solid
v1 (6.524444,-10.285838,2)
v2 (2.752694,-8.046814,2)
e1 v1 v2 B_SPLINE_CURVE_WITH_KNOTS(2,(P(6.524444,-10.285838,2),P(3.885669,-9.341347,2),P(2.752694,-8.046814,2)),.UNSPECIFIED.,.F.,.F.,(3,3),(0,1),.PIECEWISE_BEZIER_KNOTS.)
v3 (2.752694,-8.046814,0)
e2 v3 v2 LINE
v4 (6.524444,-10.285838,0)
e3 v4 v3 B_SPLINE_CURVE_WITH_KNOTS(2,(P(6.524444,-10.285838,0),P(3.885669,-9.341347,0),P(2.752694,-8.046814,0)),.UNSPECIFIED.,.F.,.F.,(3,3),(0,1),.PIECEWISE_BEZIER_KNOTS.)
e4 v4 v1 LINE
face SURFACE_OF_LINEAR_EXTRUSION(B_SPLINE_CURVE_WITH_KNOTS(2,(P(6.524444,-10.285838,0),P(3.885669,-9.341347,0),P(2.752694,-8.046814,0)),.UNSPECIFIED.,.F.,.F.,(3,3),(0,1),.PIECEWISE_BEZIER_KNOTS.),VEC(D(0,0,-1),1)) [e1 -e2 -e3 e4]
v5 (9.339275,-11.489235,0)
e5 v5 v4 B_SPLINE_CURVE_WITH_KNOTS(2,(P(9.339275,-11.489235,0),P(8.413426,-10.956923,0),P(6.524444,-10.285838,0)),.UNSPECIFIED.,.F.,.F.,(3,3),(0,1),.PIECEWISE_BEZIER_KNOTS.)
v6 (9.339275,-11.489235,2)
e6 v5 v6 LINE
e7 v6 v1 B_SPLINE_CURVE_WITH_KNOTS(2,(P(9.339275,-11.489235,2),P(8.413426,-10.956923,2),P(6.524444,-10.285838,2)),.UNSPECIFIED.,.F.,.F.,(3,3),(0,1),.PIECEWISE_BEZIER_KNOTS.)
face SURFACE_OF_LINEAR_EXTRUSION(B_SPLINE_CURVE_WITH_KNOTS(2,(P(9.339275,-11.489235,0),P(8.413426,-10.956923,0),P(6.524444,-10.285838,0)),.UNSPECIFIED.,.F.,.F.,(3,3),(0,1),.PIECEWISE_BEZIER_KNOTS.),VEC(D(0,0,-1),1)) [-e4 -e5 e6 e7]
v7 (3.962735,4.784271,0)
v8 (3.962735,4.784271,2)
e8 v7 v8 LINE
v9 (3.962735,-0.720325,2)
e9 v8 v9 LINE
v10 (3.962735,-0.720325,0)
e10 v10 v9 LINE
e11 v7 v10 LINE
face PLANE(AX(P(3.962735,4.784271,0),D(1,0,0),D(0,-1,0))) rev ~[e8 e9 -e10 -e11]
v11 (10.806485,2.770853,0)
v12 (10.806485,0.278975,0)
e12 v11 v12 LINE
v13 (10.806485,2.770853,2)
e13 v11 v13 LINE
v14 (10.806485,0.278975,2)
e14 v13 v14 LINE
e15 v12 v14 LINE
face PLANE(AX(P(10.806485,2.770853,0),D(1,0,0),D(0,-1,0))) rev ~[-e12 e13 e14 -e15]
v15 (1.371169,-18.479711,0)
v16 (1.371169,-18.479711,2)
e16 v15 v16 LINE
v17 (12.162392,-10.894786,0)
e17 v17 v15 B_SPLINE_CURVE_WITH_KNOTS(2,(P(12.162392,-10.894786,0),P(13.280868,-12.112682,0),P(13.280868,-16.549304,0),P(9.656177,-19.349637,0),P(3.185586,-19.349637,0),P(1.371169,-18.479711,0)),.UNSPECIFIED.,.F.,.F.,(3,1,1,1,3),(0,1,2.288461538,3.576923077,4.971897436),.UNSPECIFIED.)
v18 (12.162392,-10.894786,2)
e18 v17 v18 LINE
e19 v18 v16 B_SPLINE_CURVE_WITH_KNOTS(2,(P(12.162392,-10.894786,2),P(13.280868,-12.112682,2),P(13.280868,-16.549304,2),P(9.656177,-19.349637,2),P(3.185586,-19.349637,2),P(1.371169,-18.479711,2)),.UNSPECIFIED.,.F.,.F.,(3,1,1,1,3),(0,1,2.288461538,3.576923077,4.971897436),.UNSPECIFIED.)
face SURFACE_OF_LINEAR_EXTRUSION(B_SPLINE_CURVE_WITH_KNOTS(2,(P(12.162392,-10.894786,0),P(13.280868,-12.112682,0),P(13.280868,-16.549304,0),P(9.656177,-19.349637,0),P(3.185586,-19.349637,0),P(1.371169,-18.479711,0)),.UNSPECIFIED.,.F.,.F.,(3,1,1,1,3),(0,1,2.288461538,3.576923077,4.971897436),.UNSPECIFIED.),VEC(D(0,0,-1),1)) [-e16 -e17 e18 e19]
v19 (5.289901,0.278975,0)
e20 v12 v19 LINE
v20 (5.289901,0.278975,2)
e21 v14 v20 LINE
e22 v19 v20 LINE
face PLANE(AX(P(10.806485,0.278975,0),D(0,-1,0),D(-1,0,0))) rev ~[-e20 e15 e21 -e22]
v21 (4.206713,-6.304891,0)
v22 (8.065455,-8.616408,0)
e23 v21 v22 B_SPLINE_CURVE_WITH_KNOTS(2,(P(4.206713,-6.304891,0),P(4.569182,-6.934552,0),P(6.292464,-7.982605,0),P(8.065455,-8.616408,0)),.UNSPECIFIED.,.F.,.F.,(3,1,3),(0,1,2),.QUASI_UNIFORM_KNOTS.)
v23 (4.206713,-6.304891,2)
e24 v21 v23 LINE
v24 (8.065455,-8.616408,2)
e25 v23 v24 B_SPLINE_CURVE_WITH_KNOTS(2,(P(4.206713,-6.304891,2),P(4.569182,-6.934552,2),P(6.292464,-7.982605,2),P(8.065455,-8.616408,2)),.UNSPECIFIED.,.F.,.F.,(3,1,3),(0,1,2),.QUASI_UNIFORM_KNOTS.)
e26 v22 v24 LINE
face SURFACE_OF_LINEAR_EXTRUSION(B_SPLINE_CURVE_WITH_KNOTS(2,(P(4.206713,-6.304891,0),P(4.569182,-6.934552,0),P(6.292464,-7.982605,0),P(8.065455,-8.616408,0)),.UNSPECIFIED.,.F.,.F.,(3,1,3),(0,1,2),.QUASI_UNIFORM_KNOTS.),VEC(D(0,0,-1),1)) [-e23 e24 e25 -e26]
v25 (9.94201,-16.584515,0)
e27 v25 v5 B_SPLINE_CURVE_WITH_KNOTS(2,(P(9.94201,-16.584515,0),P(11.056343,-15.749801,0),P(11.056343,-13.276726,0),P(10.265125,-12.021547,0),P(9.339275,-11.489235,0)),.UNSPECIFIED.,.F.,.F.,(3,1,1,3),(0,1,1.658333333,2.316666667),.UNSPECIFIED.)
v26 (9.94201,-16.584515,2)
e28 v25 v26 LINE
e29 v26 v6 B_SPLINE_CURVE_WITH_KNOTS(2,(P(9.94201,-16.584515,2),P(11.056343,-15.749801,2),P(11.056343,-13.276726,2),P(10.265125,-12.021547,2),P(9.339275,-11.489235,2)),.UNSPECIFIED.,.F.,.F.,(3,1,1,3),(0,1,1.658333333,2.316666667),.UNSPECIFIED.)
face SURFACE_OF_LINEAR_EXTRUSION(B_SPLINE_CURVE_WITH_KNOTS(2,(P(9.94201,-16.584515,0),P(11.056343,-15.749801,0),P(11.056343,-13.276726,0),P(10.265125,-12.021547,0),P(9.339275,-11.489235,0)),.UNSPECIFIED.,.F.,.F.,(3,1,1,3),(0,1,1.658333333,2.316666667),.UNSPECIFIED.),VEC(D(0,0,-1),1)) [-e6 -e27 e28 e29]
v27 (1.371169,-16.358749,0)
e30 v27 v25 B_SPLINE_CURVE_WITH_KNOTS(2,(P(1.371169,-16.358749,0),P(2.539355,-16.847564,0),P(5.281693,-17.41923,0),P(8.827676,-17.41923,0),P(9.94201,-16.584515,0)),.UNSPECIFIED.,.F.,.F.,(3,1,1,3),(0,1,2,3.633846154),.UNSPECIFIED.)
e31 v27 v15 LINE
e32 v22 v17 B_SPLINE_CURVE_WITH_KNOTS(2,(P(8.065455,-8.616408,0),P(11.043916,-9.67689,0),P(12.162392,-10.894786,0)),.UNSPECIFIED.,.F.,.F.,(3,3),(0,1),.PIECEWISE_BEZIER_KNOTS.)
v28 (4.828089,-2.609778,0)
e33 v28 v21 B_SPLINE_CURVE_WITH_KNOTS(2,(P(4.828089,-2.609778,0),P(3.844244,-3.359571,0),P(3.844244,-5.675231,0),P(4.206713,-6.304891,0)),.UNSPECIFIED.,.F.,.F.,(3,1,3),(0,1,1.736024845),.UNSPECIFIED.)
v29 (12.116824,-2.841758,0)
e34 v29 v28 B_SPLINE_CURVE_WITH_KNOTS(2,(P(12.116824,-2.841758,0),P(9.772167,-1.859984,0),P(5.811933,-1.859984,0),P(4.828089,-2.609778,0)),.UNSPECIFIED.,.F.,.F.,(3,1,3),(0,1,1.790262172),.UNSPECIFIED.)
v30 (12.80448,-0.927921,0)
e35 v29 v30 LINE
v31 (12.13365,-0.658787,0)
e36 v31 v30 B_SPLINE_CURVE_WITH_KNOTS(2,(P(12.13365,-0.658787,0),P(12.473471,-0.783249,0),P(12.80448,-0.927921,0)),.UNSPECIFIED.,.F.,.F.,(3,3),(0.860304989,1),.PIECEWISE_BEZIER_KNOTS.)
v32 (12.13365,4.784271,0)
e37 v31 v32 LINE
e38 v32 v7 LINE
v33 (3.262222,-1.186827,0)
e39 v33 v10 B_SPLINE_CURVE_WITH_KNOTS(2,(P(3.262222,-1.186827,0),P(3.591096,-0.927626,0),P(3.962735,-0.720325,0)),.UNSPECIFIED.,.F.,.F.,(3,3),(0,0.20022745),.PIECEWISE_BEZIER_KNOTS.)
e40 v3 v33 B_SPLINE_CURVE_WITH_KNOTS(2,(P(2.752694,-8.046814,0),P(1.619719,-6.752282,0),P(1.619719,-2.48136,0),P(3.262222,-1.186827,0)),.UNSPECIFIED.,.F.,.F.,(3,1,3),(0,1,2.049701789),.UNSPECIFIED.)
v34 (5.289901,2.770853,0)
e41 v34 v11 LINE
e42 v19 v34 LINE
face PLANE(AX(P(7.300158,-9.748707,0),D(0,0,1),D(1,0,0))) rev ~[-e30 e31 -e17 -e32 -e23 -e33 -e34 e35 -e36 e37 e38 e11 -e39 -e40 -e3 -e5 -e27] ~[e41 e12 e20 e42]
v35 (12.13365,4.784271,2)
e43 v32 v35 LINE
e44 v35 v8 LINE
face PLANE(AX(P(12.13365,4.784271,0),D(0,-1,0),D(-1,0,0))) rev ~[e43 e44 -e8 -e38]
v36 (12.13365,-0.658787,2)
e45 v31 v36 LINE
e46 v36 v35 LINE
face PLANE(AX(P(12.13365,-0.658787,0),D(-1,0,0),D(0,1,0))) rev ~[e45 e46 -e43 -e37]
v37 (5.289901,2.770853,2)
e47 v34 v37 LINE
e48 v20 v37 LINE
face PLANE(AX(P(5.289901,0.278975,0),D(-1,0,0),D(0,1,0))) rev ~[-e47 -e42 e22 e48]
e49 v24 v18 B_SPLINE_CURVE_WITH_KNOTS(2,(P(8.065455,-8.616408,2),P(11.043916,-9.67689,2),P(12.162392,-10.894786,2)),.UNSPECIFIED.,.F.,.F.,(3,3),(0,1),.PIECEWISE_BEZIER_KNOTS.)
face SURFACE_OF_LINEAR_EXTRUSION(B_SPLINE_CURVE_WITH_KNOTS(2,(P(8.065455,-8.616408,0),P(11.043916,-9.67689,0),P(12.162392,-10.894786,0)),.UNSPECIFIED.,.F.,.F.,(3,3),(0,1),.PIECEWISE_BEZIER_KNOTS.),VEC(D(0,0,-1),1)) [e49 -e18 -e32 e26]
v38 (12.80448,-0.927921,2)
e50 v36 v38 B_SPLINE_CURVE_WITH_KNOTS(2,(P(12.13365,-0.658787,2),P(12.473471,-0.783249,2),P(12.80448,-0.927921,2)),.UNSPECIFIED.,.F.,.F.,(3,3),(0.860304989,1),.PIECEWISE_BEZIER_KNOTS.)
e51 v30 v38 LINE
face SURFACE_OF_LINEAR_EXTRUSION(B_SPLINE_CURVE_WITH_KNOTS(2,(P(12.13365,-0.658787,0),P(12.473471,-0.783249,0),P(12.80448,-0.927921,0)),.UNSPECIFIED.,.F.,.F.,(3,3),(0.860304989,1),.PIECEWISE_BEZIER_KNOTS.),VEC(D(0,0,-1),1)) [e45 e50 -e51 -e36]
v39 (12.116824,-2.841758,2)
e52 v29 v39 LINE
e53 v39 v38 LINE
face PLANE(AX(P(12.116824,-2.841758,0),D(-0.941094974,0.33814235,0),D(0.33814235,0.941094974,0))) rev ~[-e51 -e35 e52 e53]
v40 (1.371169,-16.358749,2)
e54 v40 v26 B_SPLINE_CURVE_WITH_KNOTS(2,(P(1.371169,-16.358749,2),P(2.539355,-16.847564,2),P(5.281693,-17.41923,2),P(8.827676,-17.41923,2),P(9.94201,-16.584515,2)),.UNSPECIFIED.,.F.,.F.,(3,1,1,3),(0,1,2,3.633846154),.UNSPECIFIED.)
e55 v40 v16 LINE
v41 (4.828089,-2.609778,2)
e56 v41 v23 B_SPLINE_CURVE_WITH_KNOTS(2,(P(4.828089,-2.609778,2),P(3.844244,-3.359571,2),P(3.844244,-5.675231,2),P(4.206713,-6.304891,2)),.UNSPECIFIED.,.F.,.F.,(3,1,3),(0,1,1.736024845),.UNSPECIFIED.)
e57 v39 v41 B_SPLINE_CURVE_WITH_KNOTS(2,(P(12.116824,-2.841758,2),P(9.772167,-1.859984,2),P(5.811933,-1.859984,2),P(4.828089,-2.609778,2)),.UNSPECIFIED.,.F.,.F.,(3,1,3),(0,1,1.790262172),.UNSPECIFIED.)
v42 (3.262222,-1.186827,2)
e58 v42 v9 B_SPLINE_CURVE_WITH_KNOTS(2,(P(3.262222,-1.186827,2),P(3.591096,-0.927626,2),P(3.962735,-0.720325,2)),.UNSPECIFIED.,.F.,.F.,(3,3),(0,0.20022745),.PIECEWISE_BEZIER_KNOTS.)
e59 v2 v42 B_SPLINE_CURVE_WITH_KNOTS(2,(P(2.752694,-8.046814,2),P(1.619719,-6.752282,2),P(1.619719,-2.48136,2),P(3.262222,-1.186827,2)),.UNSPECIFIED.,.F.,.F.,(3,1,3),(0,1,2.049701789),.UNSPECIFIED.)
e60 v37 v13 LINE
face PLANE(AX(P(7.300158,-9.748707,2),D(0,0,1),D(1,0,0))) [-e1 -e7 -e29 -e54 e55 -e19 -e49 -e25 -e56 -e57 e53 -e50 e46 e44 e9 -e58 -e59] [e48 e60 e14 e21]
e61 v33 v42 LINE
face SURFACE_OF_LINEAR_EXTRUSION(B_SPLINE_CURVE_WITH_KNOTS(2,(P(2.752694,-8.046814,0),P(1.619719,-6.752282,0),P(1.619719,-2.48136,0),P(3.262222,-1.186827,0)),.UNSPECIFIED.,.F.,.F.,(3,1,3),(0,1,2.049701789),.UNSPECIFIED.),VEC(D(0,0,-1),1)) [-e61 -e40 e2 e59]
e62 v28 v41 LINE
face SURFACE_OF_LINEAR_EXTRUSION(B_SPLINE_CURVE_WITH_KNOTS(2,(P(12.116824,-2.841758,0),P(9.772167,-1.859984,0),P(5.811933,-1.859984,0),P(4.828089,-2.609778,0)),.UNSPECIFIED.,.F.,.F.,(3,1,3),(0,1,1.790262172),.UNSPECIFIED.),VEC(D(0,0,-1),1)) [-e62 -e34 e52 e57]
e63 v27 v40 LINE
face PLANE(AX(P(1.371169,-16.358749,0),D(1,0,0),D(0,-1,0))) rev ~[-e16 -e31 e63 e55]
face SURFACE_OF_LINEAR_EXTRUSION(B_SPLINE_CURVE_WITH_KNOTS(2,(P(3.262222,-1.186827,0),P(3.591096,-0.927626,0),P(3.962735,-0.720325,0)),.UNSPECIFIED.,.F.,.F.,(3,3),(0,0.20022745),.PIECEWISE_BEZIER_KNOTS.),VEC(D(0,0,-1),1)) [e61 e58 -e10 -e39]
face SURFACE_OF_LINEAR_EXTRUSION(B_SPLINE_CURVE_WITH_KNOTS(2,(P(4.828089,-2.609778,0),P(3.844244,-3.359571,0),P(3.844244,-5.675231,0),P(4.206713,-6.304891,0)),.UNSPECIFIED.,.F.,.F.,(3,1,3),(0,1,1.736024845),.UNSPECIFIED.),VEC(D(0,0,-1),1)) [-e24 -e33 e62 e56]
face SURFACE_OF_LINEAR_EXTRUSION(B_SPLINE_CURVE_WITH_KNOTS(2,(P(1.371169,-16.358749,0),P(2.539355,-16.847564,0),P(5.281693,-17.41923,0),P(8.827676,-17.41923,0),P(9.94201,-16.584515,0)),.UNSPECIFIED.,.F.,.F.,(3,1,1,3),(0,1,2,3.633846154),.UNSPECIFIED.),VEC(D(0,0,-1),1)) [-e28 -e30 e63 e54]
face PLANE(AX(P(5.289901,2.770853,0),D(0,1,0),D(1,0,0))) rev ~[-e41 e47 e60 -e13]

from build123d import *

# Parameters (mm, degrees)
F1_DEPTH = 2


# Not quite as in the source:
# - a feature names something its author has since deleted; it is built from what else it names


with BuildPart() as f1:
    # F0 (on Top) → F1 (new body)
    with BuildSketch(Plane.XY):
        with BuildLine():
            Line((12.1336504817, -0.6587872652), (12.1336504817, -1.7344431253))
            Line((12.1336504817, -1.7344431253), (8.0481928308, -1.7344431253))
            Line((8.0481928308, -1.7344431253), (3.9627351798, -1.7344431253))
            Line((3.9627351798, -1.7344431253), (3.9627351798, -0.7203246705))
            add(Edge.make_bspline(
                [(3.2622219629, -1.1868274189), (3.5910961238, -0.9276264724), (3.9627351798, -0.7203246705)],
                knots=[0, 0, 0, 0.2002274501, 0.2002274501, 0.2002274501], degree=2))
            add(Edge.make_bspline(
                [(1.6197190952, -4.668602098), (1.6197190952, -2.4813599438), (3.2622219629, -1.1868274189)],
                knots=[0, 0, 0, 1, 1, 1], degree=2))
            add(Edge.make_bspline(
                [(2.7526939611, -8.0468141751), (1.6197190952, -6.7522816502), (1.6197190952, -4.668602098)],
                knots=[0, 0, 0, 1, 1, 1], degree=2))
            add(Edge.make_bspline(
                [(6.5244439258, -10.2858376303), (3.8856688269, -9.3413467001), (2.7526939611, -8.0468141751)],
                knots=[0, 0, 0, 1, 1, 1], degree=2))
            add(Edge.make_bspline(
                [(9.339275448, -11.4892350655), (8.4134257862, -10.9569232912), (6.5244439258, -10.2858376303)],
                knots=[0, 0, 0, 1, 1, 1], degree=2))
            add(Edge.make_bspline(
                [(10.6607342495, -12.6491362079), (10.2651251099, -12.0215468398), (9.339275448, -11.4892350655)],
                knots=[0, 0, 0, 1, 1, 1], degree=2))
            add(Edge.make_bspline(
                [(11.0563433891, -14.2584990429), (11.0563433891, -13.276725576), (10.6607342495, -12.6491362079)],
                knots=[0, 0, 0, 1, 1, 1], degree=2))
            add(Edge.make_bspline(
                [(9.9420097917, -16.5845150837), (11.0563433891, -15.7498005116), (11.0563433891, -14.2584990429)],
                knots=[0, 0, 0, 1, 1, 1], degree=2))
            add(Edge.make_bspline(
                [(6.6280065278, -17.4192296558), (8.8276761942, -17.4192296558), (9.9420097917, -16.5845150837)],
                knots=[0, 0, 0, 1, 1, 1], degree=2))
            add(Edge.make_bspline(
                [(3.9105238514, -17.1333968743), (5.2816927018, -17.4192296558), (6.6280065278, -17.4192296558)],
                knots=[0, 0, 0, 1, 1, 1], degree=2))
            add(Edge.make_bspline(
                [(1.3711688504, -16.3587486114), (2.539355001, -16.8475640928), (3.9105238514, -17.1333968743)],
                knots=[0, 0, 0, 1, 1, 1], degree=2))
            Line((1.3711688504, -16.3587486114), (1.3711688504, -18.4797107003))
            add(Edge.make_bspline(
                [(6.5492989503, -19.349636557), (3.1855856374, -19.349636557), (1.3711688504, -18.4797107003)],
                knots=[0, 0, 0, 1, 1, 1], degree=2))
            add(Edge.make_bspline(
                [(11.4685225451, -17.949470178), (9.6561770102, -19.349636557), (6.5492989503, -19.349636557)],
                knots=[0, 0, 0, 1, 1, 1], degree=2))
            add(Edge.make_bspline(
                [(13.28086808, -14.0513738389), (13.28086808, -16.549303799), (11.4685225451, -17.949470178)],
                knots=[0, 0, 0, 1, 1, 1], degree=2))
            add(Edge.make_bspline(
                [(12.1623919785, -10.89478573), (13.28086808, -12.1126819295), (13.28086808, -14.0513738389)],
                knots=[0, 0, 0, 1, 1, 1], degree=2))
            add(Edge.make_bspline(
                [(8.0654554435, -8.6164084861), (11.0439158769, -9.6768895306), (12.1623919785, -10.89478573)],
                knots=[0, 0, 0, 1, 1, 1], degree=2))
            add(Edge.make_bspline(
                [(5.4308228487, -7.4585785958), (6.2924636973, -7.9826053619), (8.0654554435, -8.6164084861)],
                knots=[0, 0, 0, 1, 1, 1], degree=2))
            add(Edge.make_bspline(
                [(4.2067128931, -6.3048912095), (4.5691820001, -6.9345518297), (5.4308228487, -7.4585785958)],
                knots=[0, 0, 0, 1, 1, 1], degree=2))
            add(Edge.make_bspline(
                [(3.8442437861, -4.6934571225), (3.8442437861, -5.6752305894), (4.2067128931, -6.3048912095)],
                knots=[0, 0, 0, 1, 1, 1], degree=2))
            add(Edge.make_bspline(
                [(4.8280885051, -2.6097775703), (3.8442437861, -3.3595708088), (3.8442437861, -4.6934571225)],
                knots=[0, 0, 0, 1, 1, 1], degree=2))
            add(Edge.make_bspline(
                [(7.5600699457, -1.8599843319), (5.811933224, -1.8599843319), (4.8280885051, -2.6097775703)],
                knots=[0, 0, 0, 1, 1, 1], degree=2))
            add(Edge.make_bspline(
                [(12.1168244336, -2.8417577988), (9.7721671244, -1.8599843319), (7.5600699457, -1.8599843319)],
                knots=[0, 0, 0, 1, 1, 1], degree=2))
            Line((12.1168244336, -2.8417577988), (12.8044801109, -0.9279209139))
            add(Edge.make_bspline(
                [(12.1336504817, -0.6587872652), (12.4734710603, -0.7832491261), (12.8044801109, -0.9279209139)],
                knots=[0.8603049894, 0.8603049894, 0.8603049894, 1, 1, 1], degree=2))
        make_face()
        with BuildLine():
            Line((8.0481928308, -1.7344431253), (12.1336504817, -1.7344431253))
            Line((12.1336504817, -1.7344431253), (12.1336504817, -0.6587872652))
            add(Edge.make_bspline(
                [(8.0481928308, 0.1014929313), (10.2292854005, 0.0387008703), (12.1336504817, -0.6587872652)],
                knots=[0.0774498097, 0.0774498097, 0.0774498097, 0.8603049894, 0.8603049894, 0.8603049894], degree=2))
            Line((8.0481928308, 0.1014929313), (8.0481928308, -1.7344431253))
        make_face()
        with BuildLine():
            Line((3.9627351798, -1.7344431253), (8.0481928308, -1.7344431253))
            Line((8.0481928308, -1.7344431253), (8.0481928308, 0.1014929313))
            add(Edge.make_bspline(
                [(7.6139224988, 0.1077051061), (7.8324119189, 0.1077051061), (8.0481928308, 0.1014929313)],
                knots=[0, 0, 0, 0.0774498097, 0.0774498097, 0.0774498097], degree=2))
            add(Edge.make_bspline(
                [(3.9627351798, -0.7203246705), (5.4471805714, 0.1077051061), (7.6139224988, 0.1077051061)],
                knots=[0.2002274501, 0.2002274501, 0.2002274501, 1, 1, 1], degree=2))
            Line((3.9627351798, -0.7203246705), (3.9627351798, -1.7344431253))
        make_face()
        with BuildLine():
            add(Edge.make_bspline(
                [(8.0481928308, 0.1014929313), (10.2292854005, 0.0387008703), (12.1336504817, -0.6587872652)],
                knots=[0.0774498097, 0.0774498097, 0.0774498097, 0.8603049894, 0.8603049894, 0.8603049894], degree=2))
            Line((12.1336504817, -0.6587872652), (12.1336504817, 3.1816535629))
            Line((12.1336504817, 3.1816535629), (12.1336504817, 4.784271121))
            Line((12.1336504817, 4.784271121), (8.0481928308, 4.784271121))
            Line((8.0481928308, 4.784271121), (8.0481928308, 2.7708526759))
            Line((8.0481928308, 2.7708526759), (10.8064850792, 2.7708526759))
            Line((10.8064850792, 2.7708526759), (10.8064850792, 0.2789753198))
            Line((10.8064850792, 0.2789753198), (8.0481928308, 0.2789753198))
            Line((8.0481928308, 0.2789753198), (8.0481928308, 0.1014929313))
        make_face()
        with BuildLine():
            add(Edge.make_bspline(
                [(7.6139224988, 0.1077051061), (7.8324119189, 0.1077051061), (8.0481928308, 0.1014929313)],
                knots=[0, 0, 0, 0.0774498097, 0.0774498097, 0.0774498097], degree=2))
            Line((8.0481928308, 0.1014929313), (8.0481928308, 0.2789753198))
            Line((8.0481928308, 0.2789753198), (5.2899005823, 0.2789753198))
            Line((5.2899005823, 0.2789753198), (5.2899005823, 2.7708526759))
            Line((5.2899005823, 2.7708526759), (8.0481928308, 2.7708526759))
            Line((8.0481928308, 2.7708526759), (8.0481928308, 4.784271121))
            Line((8.0481928308, 4.784271121), (3.9627351798, 4.784271121))
            Line((3.9627351798, 4.784271121), (3.9627351798, 3.1816535629))
            Line((3.9627351798, 3.1816535629), (3.9627351798, -0.7203246705))
            add(Edge.make_bspline(
                [(3.9627351798, -0.7203246705), (5.4471805714, 0.1077051061), (7.6139224988, 0.1077051061)],
                knots=[0.2002274501, 0.2002274501, 0.2002274501, 1, 1, 1], degree=2))
        make_face()
    extrude(amount=F1_DEPTH)


solid = f1.part
